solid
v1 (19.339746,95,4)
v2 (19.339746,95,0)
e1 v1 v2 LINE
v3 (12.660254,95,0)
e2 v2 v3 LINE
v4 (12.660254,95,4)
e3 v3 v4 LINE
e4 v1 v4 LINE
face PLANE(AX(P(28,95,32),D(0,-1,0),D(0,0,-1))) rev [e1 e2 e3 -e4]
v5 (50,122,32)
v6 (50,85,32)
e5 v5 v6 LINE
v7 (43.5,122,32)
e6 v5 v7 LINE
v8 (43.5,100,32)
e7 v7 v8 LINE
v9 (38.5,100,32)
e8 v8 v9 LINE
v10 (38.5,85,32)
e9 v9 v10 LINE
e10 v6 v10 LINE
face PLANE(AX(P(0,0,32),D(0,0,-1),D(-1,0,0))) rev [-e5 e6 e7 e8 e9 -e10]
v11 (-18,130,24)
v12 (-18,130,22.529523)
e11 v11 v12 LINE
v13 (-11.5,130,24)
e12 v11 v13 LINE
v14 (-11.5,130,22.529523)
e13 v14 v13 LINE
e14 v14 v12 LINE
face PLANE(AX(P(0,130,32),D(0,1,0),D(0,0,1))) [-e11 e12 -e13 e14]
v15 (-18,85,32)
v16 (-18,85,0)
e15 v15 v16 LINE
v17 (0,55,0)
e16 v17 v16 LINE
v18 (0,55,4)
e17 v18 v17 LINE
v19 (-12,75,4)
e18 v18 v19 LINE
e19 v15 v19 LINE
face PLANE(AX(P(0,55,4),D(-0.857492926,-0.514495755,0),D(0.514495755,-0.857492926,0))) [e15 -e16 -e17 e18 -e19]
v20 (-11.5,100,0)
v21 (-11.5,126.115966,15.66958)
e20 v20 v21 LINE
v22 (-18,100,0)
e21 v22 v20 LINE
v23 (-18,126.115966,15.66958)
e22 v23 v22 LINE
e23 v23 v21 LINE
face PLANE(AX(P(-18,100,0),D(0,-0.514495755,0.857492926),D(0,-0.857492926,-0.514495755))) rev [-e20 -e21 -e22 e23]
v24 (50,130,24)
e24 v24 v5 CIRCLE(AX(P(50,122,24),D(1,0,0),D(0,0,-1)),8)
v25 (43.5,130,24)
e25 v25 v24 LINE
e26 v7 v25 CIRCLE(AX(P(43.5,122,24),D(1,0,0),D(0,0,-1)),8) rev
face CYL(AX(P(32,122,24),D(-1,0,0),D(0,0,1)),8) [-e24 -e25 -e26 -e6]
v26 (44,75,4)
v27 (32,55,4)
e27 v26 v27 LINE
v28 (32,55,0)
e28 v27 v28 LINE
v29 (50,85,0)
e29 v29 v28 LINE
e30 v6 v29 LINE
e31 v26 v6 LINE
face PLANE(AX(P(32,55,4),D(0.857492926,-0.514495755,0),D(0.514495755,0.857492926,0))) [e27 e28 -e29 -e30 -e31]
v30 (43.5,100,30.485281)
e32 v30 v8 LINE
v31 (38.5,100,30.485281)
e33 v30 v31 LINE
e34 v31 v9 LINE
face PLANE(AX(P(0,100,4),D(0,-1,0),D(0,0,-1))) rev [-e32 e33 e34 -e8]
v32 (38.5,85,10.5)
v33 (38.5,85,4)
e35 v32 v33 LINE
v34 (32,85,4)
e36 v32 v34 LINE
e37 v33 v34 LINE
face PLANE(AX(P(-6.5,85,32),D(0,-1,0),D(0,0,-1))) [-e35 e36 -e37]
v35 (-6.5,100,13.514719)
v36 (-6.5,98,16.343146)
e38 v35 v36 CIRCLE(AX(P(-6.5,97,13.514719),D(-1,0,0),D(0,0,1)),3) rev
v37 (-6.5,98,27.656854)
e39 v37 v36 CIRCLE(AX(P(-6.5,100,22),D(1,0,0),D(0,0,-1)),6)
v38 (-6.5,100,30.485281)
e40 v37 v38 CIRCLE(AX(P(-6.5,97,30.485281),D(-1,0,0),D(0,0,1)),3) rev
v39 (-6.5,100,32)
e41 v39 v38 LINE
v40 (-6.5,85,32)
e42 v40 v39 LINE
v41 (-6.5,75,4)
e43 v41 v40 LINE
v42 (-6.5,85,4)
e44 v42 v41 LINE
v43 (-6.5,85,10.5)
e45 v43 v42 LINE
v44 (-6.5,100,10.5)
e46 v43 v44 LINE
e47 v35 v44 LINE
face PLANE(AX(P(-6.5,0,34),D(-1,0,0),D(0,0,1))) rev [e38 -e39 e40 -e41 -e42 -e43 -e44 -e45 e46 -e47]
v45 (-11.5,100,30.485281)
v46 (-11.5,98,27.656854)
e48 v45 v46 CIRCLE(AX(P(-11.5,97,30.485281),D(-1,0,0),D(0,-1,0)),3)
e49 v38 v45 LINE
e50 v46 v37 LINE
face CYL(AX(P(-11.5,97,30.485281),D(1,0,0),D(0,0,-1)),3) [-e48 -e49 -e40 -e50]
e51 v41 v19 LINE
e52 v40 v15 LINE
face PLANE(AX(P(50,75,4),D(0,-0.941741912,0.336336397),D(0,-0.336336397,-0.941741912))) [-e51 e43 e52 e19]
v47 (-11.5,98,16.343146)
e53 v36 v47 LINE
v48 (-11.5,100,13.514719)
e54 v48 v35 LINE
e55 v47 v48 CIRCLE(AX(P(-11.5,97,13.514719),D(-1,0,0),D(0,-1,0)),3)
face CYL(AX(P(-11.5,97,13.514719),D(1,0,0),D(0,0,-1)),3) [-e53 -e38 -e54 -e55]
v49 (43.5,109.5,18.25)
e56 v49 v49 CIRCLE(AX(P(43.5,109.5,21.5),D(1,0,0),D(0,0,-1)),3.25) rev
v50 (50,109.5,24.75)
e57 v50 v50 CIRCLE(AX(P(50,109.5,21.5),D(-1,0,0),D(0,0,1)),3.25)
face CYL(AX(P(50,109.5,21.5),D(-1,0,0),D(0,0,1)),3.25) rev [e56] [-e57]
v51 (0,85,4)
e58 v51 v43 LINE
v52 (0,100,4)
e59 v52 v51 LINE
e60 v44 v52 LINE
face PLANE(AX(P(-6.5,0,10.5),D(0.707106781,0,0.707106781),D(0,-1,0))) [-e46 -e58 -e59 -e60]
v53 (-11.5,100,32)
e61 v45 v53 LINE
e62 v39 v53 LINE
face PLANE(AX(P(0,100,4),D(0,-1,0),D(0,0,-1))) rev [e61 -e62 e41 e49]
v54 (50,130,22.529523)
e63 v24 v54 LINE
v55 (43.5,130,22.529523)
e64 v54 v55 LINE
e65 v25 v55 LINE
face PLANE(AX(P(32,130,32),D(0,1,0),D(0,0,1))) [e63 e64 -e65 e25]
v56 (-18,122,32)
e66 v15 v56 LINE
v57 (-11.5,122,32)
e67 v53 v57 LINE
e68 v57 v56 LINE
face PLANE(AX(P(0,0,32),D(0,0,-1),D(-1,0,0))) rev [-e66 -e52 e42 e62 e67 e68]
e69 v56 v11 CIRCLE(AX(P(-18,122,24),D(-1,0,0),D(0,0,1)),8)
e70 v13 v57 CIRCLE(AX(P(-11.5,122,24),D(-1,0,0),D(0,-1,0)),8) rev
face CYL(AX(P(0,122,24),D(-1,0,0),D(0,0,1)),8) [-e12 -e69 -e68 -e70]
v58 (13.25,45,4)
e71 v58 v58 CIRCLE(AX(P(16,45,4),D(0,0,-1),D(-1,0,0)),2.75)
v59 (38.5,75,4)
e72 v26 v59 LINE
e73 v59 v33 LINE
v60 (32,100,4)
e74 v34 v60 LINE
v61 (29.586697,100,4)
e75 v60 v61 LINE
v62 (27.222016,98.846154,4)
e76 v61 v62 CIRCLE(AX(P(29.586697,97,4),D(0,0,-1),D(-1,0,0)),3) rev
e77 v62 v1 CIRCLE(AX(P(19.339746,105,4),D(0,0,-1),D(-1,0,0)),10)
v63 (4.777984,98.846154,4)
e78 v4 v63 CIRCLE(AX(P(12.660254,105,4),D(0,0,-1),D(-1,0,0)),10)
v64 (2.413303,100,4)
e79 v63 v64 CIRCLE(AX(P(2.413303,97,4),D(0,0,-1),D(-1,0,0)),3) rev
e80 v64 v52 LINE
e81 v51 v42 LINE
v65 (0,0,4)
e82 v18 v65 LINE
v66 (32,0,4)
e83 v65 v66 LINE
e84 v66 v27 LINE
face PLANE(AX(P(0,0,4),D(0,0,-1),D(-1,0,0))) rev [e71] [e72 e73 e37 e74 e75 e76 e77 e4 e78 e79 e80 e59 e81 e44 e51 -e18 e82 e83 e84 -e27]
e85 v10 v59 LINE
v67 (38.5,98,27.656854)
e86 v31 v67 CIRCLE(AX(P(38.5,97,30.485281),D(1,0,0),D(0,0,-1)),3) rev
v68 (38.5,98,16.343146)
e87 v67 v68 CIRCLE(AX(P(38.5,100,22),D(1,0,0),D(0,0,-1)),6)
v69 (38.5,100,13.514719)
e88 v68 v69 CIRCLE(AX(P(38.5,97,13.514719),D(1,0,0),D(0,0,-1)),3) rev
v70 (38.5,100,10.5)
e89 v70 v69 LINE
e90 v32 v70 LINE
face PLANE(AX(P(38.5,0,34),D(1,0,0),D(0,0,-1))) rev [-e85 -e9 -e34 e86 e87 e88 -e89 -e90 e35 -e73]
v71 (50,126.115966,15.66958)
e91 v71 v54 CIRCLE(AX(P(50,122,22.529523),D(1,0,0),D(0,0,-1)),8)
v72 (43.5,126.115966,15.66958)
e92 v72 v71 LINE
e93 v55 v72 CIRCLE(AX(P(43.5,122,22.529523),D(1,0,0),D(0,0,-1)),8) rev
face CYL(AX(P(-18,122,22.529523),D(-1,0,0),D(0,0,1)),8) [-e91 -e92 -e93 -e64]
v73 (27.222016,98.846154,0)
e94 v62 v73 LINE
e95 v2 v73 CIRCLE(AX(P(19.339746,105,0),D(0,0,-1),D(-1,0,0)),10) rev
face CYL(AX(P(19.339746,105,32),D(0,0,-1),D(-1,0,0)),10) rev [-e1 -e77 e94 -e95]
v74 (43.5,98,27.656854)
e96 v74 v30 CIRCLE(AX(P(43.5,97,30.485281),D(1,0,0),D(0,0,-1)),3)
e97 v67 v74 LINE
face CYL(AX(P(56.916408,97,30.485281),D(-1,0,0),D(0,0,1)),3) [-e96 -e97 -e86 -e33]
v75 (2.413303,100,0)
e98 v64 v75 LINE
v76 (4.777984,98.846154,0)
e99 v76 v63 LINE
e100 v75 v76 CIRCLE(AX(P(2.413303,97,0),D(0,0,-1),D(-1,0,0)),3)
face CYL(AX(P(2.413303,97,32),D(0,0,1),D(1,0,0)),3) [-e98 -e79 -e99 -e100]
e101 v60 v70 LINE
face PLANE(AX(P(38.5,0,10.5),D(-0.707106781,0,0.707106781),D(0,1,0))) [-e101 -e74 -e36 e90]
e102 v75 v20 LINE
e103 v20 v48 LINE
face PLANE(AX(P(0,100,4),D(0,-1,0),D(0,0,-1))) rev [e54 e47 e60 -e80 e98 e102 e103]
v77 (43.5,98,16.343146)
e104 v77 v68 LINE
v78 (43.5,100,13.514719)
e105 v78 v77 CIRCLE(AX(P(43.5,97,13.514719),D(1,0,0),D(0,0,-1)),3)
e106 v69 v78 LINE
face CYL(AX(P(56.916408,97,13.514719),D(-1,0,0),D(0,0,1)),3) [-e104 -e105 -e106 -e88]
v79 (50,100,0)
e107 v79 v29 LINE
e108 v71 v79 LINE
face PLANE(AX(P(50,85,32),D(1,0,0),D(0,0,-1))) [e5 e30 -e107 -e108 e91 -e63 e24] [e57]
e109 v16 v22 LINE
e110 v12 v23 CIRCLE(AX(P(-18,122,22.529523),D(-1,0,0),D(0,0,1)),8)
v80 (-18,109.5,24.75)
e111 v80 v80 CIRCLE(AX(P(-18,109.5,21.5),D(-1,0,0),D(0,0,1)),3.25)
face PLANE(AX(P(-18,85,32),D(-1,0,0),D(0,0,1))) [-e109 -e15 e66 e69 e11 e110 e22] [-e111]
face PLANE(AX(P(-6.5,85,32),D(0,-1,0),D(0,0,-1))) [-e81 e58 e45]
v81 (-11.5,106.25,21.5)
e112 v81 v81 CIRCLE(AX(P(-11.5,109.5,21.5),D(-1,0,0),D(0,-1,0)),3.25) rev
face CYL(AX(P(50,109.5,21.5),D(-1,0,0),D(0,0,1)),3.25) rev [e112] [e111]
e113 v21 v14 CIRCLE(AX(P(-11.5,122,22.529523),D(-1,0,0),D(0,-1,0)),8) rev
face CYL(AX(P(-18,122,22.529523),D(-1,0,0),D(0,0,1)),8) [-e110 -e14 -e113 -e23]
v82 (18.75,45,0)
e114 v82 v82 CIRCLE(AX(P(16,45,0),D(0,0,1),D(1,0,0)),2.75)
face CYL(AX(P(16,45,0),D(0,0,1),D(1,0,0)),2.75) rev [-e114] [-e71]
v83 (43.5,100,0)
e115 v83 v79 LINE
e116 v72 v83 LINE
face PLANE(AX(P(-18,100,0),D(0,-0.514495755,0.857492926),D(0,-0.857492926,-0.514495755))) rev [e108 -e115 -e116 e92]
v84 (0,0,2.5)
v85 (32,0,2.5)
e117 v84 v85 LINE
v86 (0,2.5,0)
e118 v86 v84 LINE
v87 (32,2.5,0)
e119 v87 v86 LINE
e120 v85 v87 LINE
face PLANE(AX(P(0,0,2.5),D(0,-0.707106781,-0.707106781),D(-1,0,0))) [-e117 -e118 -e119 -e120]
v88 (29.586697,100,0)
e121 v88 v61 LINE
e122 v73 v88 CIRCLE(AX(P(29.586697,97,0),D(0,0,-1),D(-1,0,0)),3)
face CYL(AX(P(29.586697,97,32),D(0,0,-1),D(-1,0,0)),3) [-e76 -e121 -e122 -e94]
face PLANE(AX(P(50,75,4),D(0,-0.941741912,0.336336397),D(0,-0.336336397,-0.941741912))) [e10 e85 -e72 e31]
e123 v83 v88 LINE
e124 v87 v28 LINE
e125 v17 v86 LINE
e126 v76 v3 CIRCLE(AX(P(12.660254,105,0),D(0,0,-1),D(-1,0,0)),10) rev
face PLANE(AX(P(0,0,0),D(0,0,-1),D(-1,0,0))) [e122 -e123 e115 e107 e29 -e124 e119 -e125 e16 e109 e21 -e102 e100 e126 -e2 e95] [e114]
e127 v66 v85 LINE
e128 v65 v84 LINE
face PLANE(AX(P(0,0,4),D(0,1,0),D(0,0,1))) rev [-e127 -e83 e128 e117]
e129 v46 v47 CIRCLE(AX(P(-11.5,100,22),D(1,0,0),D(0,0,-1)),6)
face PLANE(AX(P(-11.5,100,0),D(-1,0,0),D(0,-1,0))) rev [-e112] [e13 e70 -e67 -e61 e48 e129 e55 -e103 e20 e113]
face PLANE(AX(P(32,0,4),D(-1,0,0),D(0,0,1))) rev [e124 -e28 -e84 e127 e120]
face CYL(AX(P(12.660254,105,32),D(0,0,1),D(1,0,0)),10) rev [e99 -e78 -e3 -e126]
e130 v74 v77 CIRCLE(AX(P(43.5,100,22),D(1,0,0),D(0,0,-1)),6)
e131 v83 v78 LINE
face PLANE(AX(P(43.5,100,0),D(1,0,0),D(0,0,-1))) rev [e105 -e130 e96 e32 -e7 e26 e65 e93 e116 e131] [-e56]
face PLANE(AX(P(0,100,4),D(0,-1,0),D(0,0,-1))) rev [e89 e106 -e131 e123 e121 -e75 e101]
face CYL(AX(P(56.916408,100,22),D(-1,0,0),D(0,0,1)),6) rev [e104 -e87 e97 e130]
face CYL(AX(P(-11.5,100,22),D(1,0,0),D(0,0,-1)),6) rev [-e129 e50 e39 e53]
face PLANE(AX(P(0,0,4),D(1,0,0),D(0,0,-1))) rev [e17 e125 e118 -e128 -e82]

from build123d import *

# Parameters (mm, degrees)
ESQUISSE1_W                   = 32
ESQUISSE1_H                   = 100
BOSS_EXTRU_1_DEPTH            = 4
CHANFREIN1_SIZE               = 2.5
ESQUISSE2_W                   = 18
ESQUISSE2_H                   = 45
BOSS_EXTRU_2_DEPTH            = 32
ENL_V_MAT_EXTRU_1_DEPTH       = 151.159914758
ENL_V_MAT_EXTRU_1_DEPTH_BACK  = 151.159914758
ESQUISSE3_R                   = 3.25
ENL_V_MAT_EXTRU_2_DEPTH       = 143.91256068
ENL_V_MAT_EXTRU_2_DEPTH_BACK  = 143.91256068
ESQUISSE4_W                   = 55
ESQUISSE4_H                   = 32
ENL_V_MAT_EXTRU_3_DEPTH       = 117.292734081
ENL_V_MAT_EXTRU_3_DEPTH_BACK  = 117.292734081
ESQUISSE5_W                   = 45
ESQUISSE5_H                   = 23.5
CHANFREIN2_SIZE               = 6.5
ENL_V_MAT_EXTRU_4_DEPTH       = 5
ENL_V_START                   = 50
ENL_V_MAT_EXTRU_6_DEPTH       = 5
CONG_2_R                      = 3
ENL_V_MAT_EXTRU_7_DEPTH       = 151.159914758
ENL_V_MAT_EXTRU_7_DEPTH_BACK  = 151.159914758
CONG_3_R                      = 8
BOSS_EXTRU_3_DEPTH            = 4
BOSS_EXTRU_4_DEPTH            = 68
ESQUISSE10_W                  = 45
ESQUISSE10_H                  = 10
ENL_V_MAT_EXTRU_8_DEPTH       = 143.070405081
ENL_V_MAT_EXTRU_9_DEPTH       = 143.070405081
ENL_V_MAT_EXTRU_9_DEPTH_BACK  = 143.070405081
ESQUISSE11_R                  = 2.75
ENL_V_MAT_EXTRU_10_DEPTH      = 143.91256068
ENL_V_MAT_EXTRU_10_DEPTH_BACK = 143.91256068
ESQUISSE12_W                  = 24
ESQUISSE12_H                  = 5
CONG_4_R                      = 10
CONG_5_R                      = 3


# Some blends are built 0.0001 mm under size
with BuildPart() as part:
    # Esquisse1 → Boss.-Extru.1 (new body)
    with BuildSketch(Plane.XY):
        with Locations((16, 50)):
            Rectangle(ESQUISSE1_W, ESQUISSE1_H)
    extrude(amount=BOSS_EXTRU_1_DEPTH)

    # Chanfrein1
    chanfrein1_edges = [part.edges().sort_by_distance(p)[0] for p in [
        (16, 0, 0),
    ]]
    chamfer(chanfrein1_edges, length=CHANFREIN1_SIZE)

    # Esquisse2 → Boss.-Extru.2 (add)
    with BuildSketch(Plane(origin=(0, 0, 0), x_dir=(-1, 0, 0), z_dir=(0, 0, -1))):
        with Locations((-41, 107.5)):
            Rectangle(ESQUISSE2_W, ESQUISSE2_H)
        with Locations((9, 107.5)):
            Rectangle(ESQUISSE2_W, ESQUISSE2_H)
    extrude(amount=-BOSS_EXTRU_2_DEPTH)

    # Esquisse3 → Enlèv. mat.-Extru.1 (cut, two sides: drawn at the far end of the back side and taken through both)
    with BuildSketch(Plane.ZY.offset(18).offset(-ENL_V_MAT_EXTRU_1_DEPTH_BACK)):
        with Locations((21.5, 109.5)):
            Circle(ESQUISSE3_R)
    extrude(amount=ENL_V_MAT_EXTRU_1_DEPTH + ENL_V_MAT_EXTRU_1_DEPTH_BACK, mode=Mode.SUBTRACT)

    # Esquisse4 → Enlèv. mat.-Extru.2 (cut, two sides: drawn at the far end of the back side and taken through both)
    with BuildSketch(Plane.XY.offset(32).offset(-ENL_V_MAT_EXTRU_2_DEPTH_BACK)):
        with Locations((16, 116)):
            Rectangle(ESQUISSE4_W, ESQUISSE4_H)
    extrude(amount=ENL_V_MAT_EXTRU_2_DEPTH + ENL_V_MAT_EXTRU_2_DEPTH_BACK, mode=Mode.SUBTRACT)

    # Esquisse5 → Enlèv. mat.-Extru.3 (cut, two sides: drawn at the far end of the back side and taken through both)
    with BuildSketch(Plane(origin=(0, 100, 0), x_dir=(1, 0, 0), z_dir=(0, 1, 0)).offset(-ENL_V_MAT_EXTRU_3_DEPTH_BACK)):
        with Locations((16, -22.25)):
            Rectangle(ESQUISSE5_W, ESQUISSE5_H)
    extrude(amount=ENL_V_MAT_EXTRU_3_DEPTH + ENL_V_MAT_EXTRU_3_DEPTH_BACK, mode=Mode.SUBTRACT)

    # Chanfrein2
    chanfrein2_edges = [part.edges().sort_by_distance(p)[0] for p in [
        (0, 92.5, 10.5),
        (32, 92.5, 10.5),
    ]]
    chamfer(chanfrein2_edges, length=CHANFREIN2_SIZE - 0.0001)  # a hair under: the kernel refuses the full size

    # Esquisse6 → Enlèv. mat.-Extru.4 (cut)
    with BuildSketch(Plane(origin=(-6.5, 0, 0), x_dir=(0, 0, -1), z_dir=(1, 0, 0))):
        with BuildLine():
            Line((-28, 100), (-16, 100))
            ThreePointArc((-16, 100), (-22, 94), (-28, 100))
        make_face()
    extrude(amount=-ENL_V_MAT_EXTRU_4_DEPTH, mode=Mode.SUBTRACT)

    # Esquisse6<2> → Enlèv. mat.-Extru.6 (cut)
    with BuildSketch(Plane(origin=(-6.5, 0, 0), x_dir=(0, 0, -1), z_dir=(1, 0, 0)).offset(ENL_V_START)):
        with BuildLine():
            Line((-28, 100), (-16, 100))
            ThreePointArc((-16, 100), (-22, 94), (-28, 100))
        make_face()
    extrude(amount=-ENL_V_MAT_EXTRU_6_DEPTH, mode=Mode.SUBTRACT)

    # Congé2
    cong_2_edges = [part.edges().sort_by_distance(p)[0] for p in [
        (-9, 100, 16),
        (-9, 100, 28),
        (41, 100, 16),
        (41, 100, 28),
    ]]
    fillet(cong_2_edges, radius=CONG_2_R)

    # Esquisse7 → Enlèv. mat.-Extru.7 (cut, two sides: drawn at the far end of the back side and taken through both)
    with BuildSketch(Plane(origin=(50, 0, 0), x_dir=(0, 0, -1), z_dir=(1, 0, 0)).offset(-ENL_V_MAT_EXTRU_7_DEPTH_BACK)):
        Polygon((0, 100), (-18, 130), (0, 130), align=None)
    extrude(amount=ENL_V_MAT_EXTRU_7_DEPTH + ENL_V_MAT_EXTRU_7_DEPTH_BACK, mode=Mode.SUBTRACT)

    # Congé3
    cong_3_edges = [part.edges().sort_by_distance(p)[0] for p in [
        (46.75, 130, 18),
        (-14.75, 130, 18),
        (-14.75, 130, 32),
        (46.75, 130, 32),
    ]]
    fillet(cong_3_edges, radius=CONG_3_R)

    # Esquisse8 → Boss.-Extru.3 (add)
    with BuildSketch(Plane(origin=(0, 0, 0), x_dir=(-1, 0, 0), z_dir=(0, 0, -1))):
        Polygon((0, 55), (18, 85), (0, 85), align=None)
        Polygon((-32, 85), (-32, 55), (-50, 85), align=None)
    extrude(amount=-BOSS_EXTRU_3_DEPTH)

    # Esquisse9 → Boss.-Extru.4 (add)
    with BuildSketch(Plane.ZY.offset(18)):
        Polygon((32, 85), (4, 85), (4, 75), align=None)
    extrude(amount=-BOSS_EXTRU_4_DEPTH)

    # Esquisse10 → Enlèv. mat.-Extru.8 (cut, through all)
    with BuildSketch(Plane.XY.offset(4)):
        with Locations((16, 80)):
            Rectangle(ESQUISSE10_W, ESQUISSE10_H)
        Polygon((44, 75), (50, 85), (50, 75), align=None)
        Polygon((-12, 75), (-18, 85), (-18, 75), align=None)
    extrude(amount=ENL_V_MAT_EXTRU_8_DEPTH, mode=Mode.SUBTRACT)

    # Esquisse11 → Enlèv. mat.-Extru.9 (cut, two sides: drawn at the far end of the back side and taken through both)
    with BuildSketch(Plane.XY.offset(4).offset(-ENL_V_MAT_EXTRU_9_DEPTH_BACK)):
        with Locations((16, 45)):
            Circle(ESQUISSE11_R)
    extrude(amount=ENL_V_MAT_EXTRU_9_DEPTH + ENL_V_MAT_EXTRU_9_DEPTH_BACK, mode=Mode.SUBTRACT)

    # Esquisse12 → Enlèv. mat.-Extru.10 (cut, two sides: drawn at the far end of the back side and taken through both)
    with BuildSketch(Plane(origin=(0, 0, 0), x_dir=(-1, 0, 0), z_dir=(0, 0, -1)).offset(-ENL_V_MAT_EXTRU_10_DEPTH_BACK)):
        with Locations((-16, 97.5)):
            Rectangle(ESQUISSE12_W, ESQUISSE12_H)
    extrude(amount=ENL_V_MAT_EXTRU_10_DEPTH + ENL_V_MAT_EXTRU_10_DEPTH_BACK, mode=Mode.SUBTRACT)

    # Congé4
    # the kernel refuses this fillet: 10 mm, written as the material it adds along each edge
    with BuildSketch(Plane(origin=(4, 95, 0), x_dir=(0, 1, 0), z_dir=(0, 0, 1))) as cong_4_piece_1:
        with BuildLine():
            CenterArc((10, -8.660254038), CONG_4_R, 120, 60)
            Line((0, -8.660254038), (-0.2, -8.660254038))
            Line((-0.2, -8.660254038), (-0.2, 0))
            Line((-0.2, 0), (0, 0.2))
            ThreePointArc((0, 0.2), (2.5, 0.2), (4.9, 0.173205081))
            Line((4.9, 0.173205081), (5, 0))
        make_face()
    extrude(amount=4)
    with BuildSketch(Plane(origin=(28, 95, 4), x_dir=(-1, 0, 0), z_dir=(0, 0, -1))) as cong_4_piece_2:
        with BuildLine():
            CenterArc((8.660254038, 10), CONG_4_R, 210, 60)
            Line((0, 5), (-0.173205081, 4.9))
            ThreePointArc((-0.173205081, 4.9), (-0.2, 2.5), (-0.2, 0))
            Line((-0.2, 0), (0, -0.2))
            Line((0, -0.2), (8.660254038, -0.2))
            Line((8.660254038, -0.2), (8.660254038, 0))
        make_face()
    extrude(amount=4)

    # Congé5
    cong_5_edges = [part.edges().sort_by_distance(p)[0] for p in [
        (28, 100, 2),
        (4, 100, 2),
    ]]
    fillet(cong_5_edges, radius=CONG_5_R)


solid = part.part
